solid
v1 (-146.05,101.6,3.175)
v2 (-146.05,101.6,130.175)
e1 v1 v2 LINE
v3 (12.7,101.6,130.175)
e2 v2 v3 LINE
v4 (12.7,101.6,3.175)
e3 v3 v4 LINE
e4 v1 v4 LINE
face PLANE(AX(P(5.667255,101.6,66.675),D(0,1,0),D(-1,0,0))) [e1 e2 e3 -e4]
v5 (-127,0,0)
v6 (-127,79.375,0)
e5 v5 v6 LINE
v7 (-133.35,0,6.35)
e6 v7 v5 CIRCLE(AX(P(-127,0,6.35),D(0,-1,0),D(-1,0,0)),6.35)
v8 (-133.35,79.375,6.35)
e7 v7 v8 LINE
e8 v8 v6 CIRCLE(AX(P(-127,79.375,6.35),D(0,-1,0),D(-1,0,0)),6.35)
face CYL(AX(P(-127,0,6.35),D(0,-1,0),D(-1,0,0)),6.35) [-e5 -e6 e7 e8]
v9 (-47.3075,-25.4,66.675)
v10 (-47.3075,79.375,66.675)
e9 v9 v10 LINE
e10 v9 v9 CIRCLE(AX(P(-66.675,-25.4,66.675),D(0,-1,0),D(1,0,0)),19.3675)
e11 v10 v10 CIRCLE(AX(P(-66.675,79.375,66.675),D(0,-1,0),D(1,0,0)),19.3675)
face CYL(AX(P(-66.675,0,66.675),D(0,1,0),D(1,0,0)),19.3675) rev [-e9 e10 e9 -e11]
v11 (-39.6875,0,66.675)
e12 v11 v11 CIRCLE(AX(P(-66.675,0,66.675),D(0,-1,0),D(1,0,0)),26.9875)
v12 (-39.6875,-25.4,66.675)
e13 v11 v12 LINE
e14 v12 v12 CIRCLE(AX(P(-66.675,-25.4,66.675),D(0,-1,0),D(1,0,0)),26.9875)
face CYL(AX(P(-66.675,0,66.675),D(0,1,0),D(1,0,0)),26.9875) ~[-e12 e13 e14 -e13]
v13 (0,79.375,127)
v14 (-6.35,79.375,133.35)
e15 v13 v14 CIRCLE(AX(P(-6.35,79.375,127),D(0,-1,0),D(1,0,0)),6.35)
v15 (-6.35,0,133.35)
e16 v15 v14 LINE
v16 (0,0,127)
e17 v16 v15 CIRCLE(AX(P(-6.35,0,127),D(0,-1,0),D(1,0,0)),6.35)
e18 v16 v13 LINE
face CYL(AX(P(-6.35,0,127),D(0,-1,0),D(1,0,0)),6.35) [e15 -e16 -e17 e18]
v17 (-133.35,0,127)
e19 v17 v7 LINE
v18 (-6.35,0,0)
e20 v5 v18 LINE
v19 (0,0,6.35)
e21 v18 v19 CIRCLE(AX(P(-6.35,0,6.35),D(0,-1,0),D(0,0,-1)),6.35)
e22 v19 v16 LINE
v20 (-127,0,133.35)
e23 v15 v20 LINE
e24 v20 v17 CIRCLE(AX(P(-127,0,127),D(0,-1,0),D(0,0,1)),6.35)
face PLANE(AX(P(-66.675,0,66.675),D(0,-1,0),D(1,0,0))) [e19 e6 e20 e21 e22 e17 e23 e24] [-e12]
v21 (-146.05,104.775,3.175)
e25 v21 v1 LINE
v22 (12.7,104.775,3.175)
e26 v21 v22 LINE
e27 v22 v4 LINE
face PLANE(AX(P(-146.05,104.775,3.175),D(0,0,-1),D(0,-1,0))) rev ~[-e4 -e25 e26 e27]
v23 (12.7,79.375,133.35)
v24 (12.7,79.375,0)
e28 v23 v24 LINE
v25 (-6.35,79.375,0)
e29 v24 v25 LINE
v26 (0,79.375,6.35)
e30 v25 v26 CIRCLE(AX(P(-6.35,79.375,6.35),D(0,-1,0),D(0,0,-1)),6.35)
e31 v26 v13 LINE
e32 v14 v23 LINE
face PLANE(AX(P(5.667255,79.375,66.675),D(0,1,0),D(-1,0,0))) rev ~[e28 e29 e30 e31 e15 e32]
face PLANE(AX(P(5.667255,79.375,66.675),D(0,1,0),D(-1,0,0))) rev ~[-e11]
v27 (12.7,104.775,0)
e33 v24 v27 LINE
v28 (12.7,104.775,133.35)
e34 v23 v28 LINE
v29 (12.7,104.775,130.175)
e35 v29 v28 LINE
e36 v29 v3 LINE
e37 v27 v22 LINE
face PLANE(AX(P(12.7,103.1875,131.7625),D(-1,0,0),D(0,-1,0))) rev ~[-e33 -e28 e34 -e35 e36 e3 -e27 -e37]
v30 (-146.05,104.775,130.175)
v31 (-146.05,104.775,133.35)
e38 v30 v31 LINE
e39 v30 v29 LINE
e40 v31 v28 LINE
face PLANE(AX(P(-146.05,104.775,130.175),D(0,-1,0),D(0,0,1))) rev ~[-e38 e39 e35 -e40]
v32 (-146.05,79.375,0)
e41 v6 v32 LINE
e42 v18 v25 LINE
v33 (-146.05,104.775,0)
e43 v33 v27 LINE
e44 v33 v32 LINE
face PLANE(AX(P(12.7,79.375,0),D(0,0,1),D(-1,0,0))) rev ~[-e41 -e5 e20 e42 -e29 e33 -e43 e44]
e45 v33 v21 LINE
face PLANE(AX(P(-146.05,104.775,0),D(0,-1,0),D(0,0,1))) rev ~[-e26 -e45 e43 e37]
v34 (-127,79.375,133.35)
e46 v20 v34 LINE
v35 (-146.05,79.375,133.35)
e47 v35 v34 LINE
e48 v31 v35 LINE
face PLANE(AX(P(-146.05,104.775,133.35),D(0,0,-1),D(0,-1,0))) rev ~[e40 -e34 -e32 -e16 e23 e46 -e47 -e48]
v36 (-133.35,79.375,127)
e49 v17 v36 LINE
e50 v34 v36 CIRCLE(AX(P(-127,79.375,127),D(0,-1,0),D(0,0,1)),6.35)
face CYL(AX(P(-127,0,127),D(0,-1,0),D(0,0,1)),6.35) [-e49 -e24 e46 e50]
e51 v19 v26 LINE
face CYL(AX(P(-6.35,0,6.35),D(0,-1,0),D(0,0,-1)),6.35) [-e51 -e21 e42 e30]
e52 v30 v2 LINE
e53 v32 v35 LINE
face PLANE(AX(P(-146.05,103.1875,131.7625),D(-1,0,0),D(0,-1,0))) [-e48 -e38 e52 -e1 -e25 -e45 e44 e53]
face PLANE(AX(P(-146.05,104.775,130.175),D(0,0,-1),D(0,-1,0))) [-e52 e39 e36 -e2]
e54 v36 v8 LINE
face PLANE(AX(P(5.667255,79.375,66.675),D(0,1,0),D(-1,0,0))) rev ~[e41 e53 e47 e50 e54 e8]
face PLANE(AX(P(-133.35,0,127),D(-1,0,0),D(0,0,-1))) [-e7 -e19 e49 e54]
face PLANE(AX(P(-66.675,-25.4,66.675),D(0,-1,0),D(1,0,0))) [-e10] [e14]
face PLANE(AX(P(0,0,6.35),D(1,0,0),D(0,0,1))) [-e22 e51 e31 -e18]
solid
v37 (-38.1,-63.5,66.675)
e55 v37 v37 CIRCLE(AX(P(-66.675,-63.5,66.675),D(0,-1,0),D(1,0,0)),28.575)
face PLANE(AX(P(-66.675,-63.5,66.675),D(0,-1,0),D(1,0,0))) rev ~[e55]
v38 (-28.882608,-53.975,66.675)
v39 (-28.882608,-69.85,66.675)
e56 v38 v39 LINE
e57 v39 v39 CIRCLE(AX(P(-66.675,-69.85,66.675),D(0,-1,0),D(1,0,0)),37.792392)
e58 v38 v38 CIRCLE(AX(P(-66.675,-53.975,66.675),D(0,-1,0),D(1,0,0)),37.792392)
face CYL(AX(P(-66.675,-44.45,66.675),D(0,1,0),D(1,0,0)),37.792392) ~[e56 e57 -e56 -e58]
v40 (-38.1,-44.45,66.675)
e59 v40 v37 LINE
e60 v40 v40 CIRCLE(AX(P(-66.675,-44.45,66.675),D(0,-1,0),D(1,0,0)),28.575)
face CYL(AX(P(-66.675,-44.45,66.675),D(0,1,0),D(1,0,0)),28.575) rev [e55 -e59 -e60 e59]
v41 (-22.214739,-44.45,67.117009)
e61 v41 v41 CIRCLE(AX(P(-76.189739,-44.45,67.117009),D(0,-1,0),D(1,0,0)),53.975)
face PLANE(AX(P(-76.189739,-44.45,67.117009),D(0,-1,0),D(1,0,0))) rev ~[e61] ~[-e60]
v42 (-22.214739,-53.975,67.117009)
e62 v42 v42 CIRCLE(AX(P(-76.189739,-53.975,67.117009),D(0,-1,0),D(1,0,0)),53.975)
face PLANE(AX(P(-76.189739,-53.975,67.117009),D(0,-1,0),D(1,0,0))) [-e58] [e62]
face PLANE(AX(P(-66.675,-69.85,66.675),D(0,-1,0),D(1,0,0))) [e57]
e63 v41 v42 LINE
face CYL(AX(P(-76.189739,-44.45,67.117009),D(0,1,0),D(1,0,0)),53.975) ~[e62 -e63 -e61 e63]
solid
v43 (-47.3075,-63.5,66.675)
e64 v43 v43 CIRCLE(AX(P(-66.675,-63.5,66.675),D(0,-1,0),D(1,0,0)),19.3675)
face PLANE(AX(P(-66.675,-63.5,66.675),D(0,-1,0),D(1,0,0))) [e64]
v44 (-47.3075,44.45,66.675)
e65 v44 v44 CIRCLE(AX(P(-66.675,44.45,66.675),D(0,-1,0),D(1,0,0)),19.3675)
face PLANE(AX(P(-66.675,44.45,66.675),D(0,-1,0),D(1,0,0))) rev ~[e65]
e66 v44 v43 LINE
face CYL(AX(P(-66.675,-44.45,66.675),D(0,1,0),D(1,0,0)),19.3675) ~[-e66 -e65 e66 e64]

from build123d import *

# Parameters (mm, degrees)
F0_R      = 26.9875
F0_R_2    = 19.3675
F1_DEPTH  = 25.4
F2_DEPTH  = 79.375
F3_DEPTH  = 44.45
F4_R      = 37.792391803
F4_R_2    = 28.575
F4_R_3    = 19.3675
F5_DEPTH  = 25.4
F4_R_4    = 53.975
F6_DEPTH  = 9.525
F7_DEPTH  = 19.05
F8_DEPTH  = 19.05
F9_R      = 19.3675
F10_DEPTH = 22.225
F11_W     = 3.175
F11_H     = 3.175
F12_DEPTH = 158.75


with BuildPart() as f1:
    # F0 (on Front) → F1 (new body)
    with BuildSketch(Plane.XZ):
        with Locations((-66.675, 66.675)):
            Circle(F0_R)
        with Locations((-66.675, 66.675)):
            Circle(F0_R_2, mode=Mode.SUBTRACT)
    extrude(amount=F1_DEPTH)

    # F0 (on Front) → F2 (join)
    with BuildSketch(Plane.XZ):
        with BuildLine():
            Line((-127, 0), (-6.35, 0))
            ThreePointArc((-6.35, 0), (-1.8598719395, 1.8598719395), (0, 6.35))
            Line((0, 6.35), (0, 127))
            ThreePointArc((0, 127), (-1.8598719395, 131.4901280605), (-6.35, 133.35))
            Line((-6.35, 133.35), (-127, 133.35))
            ThreePointArc((-127, 133.35), (-131.4901280605, 131.4901280605), (-133.35, 127))
            Line((-133.35, 127), (-133.35, 6.35))
            ThreePointArc((-133.35, 6.35), (-131.4901280605, 1.8598719395), (-127, 0))
        make_face()
        with Locations((-66.675, 66.675)):
            Circle(F0_R, mode=Mode.SUBTRACT)
        with Locations((-66.675, 66.675)):
            Circle(F0_R)
        with Locations((-66.675, 66.675)):
            Circle(F0_R_2, mode=Mode.SUBTRACT)
    extrude(amount=-F2_DEPTH)

    # F9 (on face) → F10 (join)
    with BuildSketch(Plane(origin=(0, 79.375, 0), x_dir=(-1, 0, 0), z_dir=(0, 1, 0))):
        with BuildLine():
            Line((6.35, 133.35), (-12.7, 133.35))
            Line((-12.7, 133.35), (-12.7, 0))
            Line((-12.7, 0), (6.35, 0))
            ThreePointArc((6.35, 0), (1.8598719395, 1.8598719395), (0, 6.35))
            Line((0, 6.35), (0, 127))
            ThreePointArc((0, 127), (1.8598719395, 131.4901280605), (6.35, 133.35))
        make_face()
        with BuildLine():
            Line((127, 133.35), (6.35, 133.35))
            ThreePointArc((6.35, 133.35), (1.8598719395, 131.4901280605), (0, 127))
            Line((0, 127), (0, 6.35))
            ThreePointArc((0, 6.35), (1.8598719395, 1.8598719395), (6.35, 0))
            Line((6.35, 0), (127, 0))
            ThreePointArc((127, 0), (131.4901280605, 1.8598719395), (133.35, 6.35))
            Line((133.35, 6.35), (133.35, 127))
            ThreePointArc((133.35, 127), (131.4901280605, 131.4901280605), (127, 133.35))
        make_face()
        with Locations((66.675, 66.675)):
            Circle(F9_R, mode=Mode.SUBTRACT)
        with BuildLine():
            Line((146.05, 133.35), (127, 133.35))
            ThreePointArc((127, 133.35), (131.4901280605, 131.4901280605), (133.35, 127))
            Line((133.35, 127), (133.35, 6.35))
            ThreePointArc((133.35, 6.35), (131.4901280605, 1.8598719395), (127, 0))
            Line((127, 0), (146.05, 0))
            Line((146.05, 0), (146.05, 133.35))
        make_face()
        with Locations((66.675, 66.675)):
            Circle(F9_R)
    extrude(amount=F10_DEPTH)

    # F11 (on face) → F12 (join)
    with BuildSketch(Plane(origin=(-146.05, 0, 0), x_dir=(0, -1, 0), z_dir=(-1, 0, 0))):
        with Locations((-103.1875, 131.7625)):
            Rectangle(F11_W, F11_H)
        with Locations((-103.1875, 1.5875)):
            Rectangle(F11_W, F11_H)
    extrude(amount=-F12_DEPTH)


with BuildPart() as f3:
    # F0 (on Front) → F3 (new body, symmetric)
    with BuildSketch(Plane.XZ):
        with Locations((-66.675, 66.675)):
            Circle(F0_R_2)
    extrude(amount=F3_DEPTH, both=True)

    # F4 (on face) → F8 (join)
    with BuildSketch(Plane.XZ.offset(44.45)):
        with Locations((-66.675, 66.675)):
            Circle(F4_R_3)
    extrude(amount=F8_DEPTH)


with BuildPart() as f5:
    # F4 (on face) → F5 (new body)
    with BuildSketch(Plane.XZ.offset(44.45)):
        with Locations((-66.675, 66.675)):
            Circle(F4_R)
        with Locations((-66.675, 66.675)):
            Circle(F4_R_2, mode=Mode.SUBTRACT)
        with Locations((-66.675, 66.675)):
            Circle(F4_R_2)
        with Locations((-66.675, 66.675)):
            Circle(F4_R_3, mode=Mode.SUBTRACT)
        with Locations((-66.675, 66.675)):
            Circle(F4_R_3)
    extrude(amount=F5_DEPTH)

    # F4 (on face) → F6 (join)
    with BuildSketch(Plane.XZ.offset(44.45)):
        with Locations((-76.1897387261, 67.1170090193)):
            Circle(F4_R_4)
        with Locations((-66.675, 66.675)):
            Circle(F4_R, mode=Mode.SUBTRACT)
    extrude(amount=F6_DEPTH)

    # F4 (on face) → F7 (cut)
    with BuildSketch(Plane.XZ.offset(44.45)):
        with Locations((-66.675, 66.675)):
            Circle(F4_R_2)
        with Locations((-66.675, 66.675)):
            Circle(F4_R_3, mode=Mode.SUBTRACT)
        with Locations((-66.675, 66.675)):
            Circle(F4_R_3)
    extrude(amount=F7_DEPTH, mode=Mode.SUBTRACT)


solid = Compound([f1.part, f3.part, f5.part])
